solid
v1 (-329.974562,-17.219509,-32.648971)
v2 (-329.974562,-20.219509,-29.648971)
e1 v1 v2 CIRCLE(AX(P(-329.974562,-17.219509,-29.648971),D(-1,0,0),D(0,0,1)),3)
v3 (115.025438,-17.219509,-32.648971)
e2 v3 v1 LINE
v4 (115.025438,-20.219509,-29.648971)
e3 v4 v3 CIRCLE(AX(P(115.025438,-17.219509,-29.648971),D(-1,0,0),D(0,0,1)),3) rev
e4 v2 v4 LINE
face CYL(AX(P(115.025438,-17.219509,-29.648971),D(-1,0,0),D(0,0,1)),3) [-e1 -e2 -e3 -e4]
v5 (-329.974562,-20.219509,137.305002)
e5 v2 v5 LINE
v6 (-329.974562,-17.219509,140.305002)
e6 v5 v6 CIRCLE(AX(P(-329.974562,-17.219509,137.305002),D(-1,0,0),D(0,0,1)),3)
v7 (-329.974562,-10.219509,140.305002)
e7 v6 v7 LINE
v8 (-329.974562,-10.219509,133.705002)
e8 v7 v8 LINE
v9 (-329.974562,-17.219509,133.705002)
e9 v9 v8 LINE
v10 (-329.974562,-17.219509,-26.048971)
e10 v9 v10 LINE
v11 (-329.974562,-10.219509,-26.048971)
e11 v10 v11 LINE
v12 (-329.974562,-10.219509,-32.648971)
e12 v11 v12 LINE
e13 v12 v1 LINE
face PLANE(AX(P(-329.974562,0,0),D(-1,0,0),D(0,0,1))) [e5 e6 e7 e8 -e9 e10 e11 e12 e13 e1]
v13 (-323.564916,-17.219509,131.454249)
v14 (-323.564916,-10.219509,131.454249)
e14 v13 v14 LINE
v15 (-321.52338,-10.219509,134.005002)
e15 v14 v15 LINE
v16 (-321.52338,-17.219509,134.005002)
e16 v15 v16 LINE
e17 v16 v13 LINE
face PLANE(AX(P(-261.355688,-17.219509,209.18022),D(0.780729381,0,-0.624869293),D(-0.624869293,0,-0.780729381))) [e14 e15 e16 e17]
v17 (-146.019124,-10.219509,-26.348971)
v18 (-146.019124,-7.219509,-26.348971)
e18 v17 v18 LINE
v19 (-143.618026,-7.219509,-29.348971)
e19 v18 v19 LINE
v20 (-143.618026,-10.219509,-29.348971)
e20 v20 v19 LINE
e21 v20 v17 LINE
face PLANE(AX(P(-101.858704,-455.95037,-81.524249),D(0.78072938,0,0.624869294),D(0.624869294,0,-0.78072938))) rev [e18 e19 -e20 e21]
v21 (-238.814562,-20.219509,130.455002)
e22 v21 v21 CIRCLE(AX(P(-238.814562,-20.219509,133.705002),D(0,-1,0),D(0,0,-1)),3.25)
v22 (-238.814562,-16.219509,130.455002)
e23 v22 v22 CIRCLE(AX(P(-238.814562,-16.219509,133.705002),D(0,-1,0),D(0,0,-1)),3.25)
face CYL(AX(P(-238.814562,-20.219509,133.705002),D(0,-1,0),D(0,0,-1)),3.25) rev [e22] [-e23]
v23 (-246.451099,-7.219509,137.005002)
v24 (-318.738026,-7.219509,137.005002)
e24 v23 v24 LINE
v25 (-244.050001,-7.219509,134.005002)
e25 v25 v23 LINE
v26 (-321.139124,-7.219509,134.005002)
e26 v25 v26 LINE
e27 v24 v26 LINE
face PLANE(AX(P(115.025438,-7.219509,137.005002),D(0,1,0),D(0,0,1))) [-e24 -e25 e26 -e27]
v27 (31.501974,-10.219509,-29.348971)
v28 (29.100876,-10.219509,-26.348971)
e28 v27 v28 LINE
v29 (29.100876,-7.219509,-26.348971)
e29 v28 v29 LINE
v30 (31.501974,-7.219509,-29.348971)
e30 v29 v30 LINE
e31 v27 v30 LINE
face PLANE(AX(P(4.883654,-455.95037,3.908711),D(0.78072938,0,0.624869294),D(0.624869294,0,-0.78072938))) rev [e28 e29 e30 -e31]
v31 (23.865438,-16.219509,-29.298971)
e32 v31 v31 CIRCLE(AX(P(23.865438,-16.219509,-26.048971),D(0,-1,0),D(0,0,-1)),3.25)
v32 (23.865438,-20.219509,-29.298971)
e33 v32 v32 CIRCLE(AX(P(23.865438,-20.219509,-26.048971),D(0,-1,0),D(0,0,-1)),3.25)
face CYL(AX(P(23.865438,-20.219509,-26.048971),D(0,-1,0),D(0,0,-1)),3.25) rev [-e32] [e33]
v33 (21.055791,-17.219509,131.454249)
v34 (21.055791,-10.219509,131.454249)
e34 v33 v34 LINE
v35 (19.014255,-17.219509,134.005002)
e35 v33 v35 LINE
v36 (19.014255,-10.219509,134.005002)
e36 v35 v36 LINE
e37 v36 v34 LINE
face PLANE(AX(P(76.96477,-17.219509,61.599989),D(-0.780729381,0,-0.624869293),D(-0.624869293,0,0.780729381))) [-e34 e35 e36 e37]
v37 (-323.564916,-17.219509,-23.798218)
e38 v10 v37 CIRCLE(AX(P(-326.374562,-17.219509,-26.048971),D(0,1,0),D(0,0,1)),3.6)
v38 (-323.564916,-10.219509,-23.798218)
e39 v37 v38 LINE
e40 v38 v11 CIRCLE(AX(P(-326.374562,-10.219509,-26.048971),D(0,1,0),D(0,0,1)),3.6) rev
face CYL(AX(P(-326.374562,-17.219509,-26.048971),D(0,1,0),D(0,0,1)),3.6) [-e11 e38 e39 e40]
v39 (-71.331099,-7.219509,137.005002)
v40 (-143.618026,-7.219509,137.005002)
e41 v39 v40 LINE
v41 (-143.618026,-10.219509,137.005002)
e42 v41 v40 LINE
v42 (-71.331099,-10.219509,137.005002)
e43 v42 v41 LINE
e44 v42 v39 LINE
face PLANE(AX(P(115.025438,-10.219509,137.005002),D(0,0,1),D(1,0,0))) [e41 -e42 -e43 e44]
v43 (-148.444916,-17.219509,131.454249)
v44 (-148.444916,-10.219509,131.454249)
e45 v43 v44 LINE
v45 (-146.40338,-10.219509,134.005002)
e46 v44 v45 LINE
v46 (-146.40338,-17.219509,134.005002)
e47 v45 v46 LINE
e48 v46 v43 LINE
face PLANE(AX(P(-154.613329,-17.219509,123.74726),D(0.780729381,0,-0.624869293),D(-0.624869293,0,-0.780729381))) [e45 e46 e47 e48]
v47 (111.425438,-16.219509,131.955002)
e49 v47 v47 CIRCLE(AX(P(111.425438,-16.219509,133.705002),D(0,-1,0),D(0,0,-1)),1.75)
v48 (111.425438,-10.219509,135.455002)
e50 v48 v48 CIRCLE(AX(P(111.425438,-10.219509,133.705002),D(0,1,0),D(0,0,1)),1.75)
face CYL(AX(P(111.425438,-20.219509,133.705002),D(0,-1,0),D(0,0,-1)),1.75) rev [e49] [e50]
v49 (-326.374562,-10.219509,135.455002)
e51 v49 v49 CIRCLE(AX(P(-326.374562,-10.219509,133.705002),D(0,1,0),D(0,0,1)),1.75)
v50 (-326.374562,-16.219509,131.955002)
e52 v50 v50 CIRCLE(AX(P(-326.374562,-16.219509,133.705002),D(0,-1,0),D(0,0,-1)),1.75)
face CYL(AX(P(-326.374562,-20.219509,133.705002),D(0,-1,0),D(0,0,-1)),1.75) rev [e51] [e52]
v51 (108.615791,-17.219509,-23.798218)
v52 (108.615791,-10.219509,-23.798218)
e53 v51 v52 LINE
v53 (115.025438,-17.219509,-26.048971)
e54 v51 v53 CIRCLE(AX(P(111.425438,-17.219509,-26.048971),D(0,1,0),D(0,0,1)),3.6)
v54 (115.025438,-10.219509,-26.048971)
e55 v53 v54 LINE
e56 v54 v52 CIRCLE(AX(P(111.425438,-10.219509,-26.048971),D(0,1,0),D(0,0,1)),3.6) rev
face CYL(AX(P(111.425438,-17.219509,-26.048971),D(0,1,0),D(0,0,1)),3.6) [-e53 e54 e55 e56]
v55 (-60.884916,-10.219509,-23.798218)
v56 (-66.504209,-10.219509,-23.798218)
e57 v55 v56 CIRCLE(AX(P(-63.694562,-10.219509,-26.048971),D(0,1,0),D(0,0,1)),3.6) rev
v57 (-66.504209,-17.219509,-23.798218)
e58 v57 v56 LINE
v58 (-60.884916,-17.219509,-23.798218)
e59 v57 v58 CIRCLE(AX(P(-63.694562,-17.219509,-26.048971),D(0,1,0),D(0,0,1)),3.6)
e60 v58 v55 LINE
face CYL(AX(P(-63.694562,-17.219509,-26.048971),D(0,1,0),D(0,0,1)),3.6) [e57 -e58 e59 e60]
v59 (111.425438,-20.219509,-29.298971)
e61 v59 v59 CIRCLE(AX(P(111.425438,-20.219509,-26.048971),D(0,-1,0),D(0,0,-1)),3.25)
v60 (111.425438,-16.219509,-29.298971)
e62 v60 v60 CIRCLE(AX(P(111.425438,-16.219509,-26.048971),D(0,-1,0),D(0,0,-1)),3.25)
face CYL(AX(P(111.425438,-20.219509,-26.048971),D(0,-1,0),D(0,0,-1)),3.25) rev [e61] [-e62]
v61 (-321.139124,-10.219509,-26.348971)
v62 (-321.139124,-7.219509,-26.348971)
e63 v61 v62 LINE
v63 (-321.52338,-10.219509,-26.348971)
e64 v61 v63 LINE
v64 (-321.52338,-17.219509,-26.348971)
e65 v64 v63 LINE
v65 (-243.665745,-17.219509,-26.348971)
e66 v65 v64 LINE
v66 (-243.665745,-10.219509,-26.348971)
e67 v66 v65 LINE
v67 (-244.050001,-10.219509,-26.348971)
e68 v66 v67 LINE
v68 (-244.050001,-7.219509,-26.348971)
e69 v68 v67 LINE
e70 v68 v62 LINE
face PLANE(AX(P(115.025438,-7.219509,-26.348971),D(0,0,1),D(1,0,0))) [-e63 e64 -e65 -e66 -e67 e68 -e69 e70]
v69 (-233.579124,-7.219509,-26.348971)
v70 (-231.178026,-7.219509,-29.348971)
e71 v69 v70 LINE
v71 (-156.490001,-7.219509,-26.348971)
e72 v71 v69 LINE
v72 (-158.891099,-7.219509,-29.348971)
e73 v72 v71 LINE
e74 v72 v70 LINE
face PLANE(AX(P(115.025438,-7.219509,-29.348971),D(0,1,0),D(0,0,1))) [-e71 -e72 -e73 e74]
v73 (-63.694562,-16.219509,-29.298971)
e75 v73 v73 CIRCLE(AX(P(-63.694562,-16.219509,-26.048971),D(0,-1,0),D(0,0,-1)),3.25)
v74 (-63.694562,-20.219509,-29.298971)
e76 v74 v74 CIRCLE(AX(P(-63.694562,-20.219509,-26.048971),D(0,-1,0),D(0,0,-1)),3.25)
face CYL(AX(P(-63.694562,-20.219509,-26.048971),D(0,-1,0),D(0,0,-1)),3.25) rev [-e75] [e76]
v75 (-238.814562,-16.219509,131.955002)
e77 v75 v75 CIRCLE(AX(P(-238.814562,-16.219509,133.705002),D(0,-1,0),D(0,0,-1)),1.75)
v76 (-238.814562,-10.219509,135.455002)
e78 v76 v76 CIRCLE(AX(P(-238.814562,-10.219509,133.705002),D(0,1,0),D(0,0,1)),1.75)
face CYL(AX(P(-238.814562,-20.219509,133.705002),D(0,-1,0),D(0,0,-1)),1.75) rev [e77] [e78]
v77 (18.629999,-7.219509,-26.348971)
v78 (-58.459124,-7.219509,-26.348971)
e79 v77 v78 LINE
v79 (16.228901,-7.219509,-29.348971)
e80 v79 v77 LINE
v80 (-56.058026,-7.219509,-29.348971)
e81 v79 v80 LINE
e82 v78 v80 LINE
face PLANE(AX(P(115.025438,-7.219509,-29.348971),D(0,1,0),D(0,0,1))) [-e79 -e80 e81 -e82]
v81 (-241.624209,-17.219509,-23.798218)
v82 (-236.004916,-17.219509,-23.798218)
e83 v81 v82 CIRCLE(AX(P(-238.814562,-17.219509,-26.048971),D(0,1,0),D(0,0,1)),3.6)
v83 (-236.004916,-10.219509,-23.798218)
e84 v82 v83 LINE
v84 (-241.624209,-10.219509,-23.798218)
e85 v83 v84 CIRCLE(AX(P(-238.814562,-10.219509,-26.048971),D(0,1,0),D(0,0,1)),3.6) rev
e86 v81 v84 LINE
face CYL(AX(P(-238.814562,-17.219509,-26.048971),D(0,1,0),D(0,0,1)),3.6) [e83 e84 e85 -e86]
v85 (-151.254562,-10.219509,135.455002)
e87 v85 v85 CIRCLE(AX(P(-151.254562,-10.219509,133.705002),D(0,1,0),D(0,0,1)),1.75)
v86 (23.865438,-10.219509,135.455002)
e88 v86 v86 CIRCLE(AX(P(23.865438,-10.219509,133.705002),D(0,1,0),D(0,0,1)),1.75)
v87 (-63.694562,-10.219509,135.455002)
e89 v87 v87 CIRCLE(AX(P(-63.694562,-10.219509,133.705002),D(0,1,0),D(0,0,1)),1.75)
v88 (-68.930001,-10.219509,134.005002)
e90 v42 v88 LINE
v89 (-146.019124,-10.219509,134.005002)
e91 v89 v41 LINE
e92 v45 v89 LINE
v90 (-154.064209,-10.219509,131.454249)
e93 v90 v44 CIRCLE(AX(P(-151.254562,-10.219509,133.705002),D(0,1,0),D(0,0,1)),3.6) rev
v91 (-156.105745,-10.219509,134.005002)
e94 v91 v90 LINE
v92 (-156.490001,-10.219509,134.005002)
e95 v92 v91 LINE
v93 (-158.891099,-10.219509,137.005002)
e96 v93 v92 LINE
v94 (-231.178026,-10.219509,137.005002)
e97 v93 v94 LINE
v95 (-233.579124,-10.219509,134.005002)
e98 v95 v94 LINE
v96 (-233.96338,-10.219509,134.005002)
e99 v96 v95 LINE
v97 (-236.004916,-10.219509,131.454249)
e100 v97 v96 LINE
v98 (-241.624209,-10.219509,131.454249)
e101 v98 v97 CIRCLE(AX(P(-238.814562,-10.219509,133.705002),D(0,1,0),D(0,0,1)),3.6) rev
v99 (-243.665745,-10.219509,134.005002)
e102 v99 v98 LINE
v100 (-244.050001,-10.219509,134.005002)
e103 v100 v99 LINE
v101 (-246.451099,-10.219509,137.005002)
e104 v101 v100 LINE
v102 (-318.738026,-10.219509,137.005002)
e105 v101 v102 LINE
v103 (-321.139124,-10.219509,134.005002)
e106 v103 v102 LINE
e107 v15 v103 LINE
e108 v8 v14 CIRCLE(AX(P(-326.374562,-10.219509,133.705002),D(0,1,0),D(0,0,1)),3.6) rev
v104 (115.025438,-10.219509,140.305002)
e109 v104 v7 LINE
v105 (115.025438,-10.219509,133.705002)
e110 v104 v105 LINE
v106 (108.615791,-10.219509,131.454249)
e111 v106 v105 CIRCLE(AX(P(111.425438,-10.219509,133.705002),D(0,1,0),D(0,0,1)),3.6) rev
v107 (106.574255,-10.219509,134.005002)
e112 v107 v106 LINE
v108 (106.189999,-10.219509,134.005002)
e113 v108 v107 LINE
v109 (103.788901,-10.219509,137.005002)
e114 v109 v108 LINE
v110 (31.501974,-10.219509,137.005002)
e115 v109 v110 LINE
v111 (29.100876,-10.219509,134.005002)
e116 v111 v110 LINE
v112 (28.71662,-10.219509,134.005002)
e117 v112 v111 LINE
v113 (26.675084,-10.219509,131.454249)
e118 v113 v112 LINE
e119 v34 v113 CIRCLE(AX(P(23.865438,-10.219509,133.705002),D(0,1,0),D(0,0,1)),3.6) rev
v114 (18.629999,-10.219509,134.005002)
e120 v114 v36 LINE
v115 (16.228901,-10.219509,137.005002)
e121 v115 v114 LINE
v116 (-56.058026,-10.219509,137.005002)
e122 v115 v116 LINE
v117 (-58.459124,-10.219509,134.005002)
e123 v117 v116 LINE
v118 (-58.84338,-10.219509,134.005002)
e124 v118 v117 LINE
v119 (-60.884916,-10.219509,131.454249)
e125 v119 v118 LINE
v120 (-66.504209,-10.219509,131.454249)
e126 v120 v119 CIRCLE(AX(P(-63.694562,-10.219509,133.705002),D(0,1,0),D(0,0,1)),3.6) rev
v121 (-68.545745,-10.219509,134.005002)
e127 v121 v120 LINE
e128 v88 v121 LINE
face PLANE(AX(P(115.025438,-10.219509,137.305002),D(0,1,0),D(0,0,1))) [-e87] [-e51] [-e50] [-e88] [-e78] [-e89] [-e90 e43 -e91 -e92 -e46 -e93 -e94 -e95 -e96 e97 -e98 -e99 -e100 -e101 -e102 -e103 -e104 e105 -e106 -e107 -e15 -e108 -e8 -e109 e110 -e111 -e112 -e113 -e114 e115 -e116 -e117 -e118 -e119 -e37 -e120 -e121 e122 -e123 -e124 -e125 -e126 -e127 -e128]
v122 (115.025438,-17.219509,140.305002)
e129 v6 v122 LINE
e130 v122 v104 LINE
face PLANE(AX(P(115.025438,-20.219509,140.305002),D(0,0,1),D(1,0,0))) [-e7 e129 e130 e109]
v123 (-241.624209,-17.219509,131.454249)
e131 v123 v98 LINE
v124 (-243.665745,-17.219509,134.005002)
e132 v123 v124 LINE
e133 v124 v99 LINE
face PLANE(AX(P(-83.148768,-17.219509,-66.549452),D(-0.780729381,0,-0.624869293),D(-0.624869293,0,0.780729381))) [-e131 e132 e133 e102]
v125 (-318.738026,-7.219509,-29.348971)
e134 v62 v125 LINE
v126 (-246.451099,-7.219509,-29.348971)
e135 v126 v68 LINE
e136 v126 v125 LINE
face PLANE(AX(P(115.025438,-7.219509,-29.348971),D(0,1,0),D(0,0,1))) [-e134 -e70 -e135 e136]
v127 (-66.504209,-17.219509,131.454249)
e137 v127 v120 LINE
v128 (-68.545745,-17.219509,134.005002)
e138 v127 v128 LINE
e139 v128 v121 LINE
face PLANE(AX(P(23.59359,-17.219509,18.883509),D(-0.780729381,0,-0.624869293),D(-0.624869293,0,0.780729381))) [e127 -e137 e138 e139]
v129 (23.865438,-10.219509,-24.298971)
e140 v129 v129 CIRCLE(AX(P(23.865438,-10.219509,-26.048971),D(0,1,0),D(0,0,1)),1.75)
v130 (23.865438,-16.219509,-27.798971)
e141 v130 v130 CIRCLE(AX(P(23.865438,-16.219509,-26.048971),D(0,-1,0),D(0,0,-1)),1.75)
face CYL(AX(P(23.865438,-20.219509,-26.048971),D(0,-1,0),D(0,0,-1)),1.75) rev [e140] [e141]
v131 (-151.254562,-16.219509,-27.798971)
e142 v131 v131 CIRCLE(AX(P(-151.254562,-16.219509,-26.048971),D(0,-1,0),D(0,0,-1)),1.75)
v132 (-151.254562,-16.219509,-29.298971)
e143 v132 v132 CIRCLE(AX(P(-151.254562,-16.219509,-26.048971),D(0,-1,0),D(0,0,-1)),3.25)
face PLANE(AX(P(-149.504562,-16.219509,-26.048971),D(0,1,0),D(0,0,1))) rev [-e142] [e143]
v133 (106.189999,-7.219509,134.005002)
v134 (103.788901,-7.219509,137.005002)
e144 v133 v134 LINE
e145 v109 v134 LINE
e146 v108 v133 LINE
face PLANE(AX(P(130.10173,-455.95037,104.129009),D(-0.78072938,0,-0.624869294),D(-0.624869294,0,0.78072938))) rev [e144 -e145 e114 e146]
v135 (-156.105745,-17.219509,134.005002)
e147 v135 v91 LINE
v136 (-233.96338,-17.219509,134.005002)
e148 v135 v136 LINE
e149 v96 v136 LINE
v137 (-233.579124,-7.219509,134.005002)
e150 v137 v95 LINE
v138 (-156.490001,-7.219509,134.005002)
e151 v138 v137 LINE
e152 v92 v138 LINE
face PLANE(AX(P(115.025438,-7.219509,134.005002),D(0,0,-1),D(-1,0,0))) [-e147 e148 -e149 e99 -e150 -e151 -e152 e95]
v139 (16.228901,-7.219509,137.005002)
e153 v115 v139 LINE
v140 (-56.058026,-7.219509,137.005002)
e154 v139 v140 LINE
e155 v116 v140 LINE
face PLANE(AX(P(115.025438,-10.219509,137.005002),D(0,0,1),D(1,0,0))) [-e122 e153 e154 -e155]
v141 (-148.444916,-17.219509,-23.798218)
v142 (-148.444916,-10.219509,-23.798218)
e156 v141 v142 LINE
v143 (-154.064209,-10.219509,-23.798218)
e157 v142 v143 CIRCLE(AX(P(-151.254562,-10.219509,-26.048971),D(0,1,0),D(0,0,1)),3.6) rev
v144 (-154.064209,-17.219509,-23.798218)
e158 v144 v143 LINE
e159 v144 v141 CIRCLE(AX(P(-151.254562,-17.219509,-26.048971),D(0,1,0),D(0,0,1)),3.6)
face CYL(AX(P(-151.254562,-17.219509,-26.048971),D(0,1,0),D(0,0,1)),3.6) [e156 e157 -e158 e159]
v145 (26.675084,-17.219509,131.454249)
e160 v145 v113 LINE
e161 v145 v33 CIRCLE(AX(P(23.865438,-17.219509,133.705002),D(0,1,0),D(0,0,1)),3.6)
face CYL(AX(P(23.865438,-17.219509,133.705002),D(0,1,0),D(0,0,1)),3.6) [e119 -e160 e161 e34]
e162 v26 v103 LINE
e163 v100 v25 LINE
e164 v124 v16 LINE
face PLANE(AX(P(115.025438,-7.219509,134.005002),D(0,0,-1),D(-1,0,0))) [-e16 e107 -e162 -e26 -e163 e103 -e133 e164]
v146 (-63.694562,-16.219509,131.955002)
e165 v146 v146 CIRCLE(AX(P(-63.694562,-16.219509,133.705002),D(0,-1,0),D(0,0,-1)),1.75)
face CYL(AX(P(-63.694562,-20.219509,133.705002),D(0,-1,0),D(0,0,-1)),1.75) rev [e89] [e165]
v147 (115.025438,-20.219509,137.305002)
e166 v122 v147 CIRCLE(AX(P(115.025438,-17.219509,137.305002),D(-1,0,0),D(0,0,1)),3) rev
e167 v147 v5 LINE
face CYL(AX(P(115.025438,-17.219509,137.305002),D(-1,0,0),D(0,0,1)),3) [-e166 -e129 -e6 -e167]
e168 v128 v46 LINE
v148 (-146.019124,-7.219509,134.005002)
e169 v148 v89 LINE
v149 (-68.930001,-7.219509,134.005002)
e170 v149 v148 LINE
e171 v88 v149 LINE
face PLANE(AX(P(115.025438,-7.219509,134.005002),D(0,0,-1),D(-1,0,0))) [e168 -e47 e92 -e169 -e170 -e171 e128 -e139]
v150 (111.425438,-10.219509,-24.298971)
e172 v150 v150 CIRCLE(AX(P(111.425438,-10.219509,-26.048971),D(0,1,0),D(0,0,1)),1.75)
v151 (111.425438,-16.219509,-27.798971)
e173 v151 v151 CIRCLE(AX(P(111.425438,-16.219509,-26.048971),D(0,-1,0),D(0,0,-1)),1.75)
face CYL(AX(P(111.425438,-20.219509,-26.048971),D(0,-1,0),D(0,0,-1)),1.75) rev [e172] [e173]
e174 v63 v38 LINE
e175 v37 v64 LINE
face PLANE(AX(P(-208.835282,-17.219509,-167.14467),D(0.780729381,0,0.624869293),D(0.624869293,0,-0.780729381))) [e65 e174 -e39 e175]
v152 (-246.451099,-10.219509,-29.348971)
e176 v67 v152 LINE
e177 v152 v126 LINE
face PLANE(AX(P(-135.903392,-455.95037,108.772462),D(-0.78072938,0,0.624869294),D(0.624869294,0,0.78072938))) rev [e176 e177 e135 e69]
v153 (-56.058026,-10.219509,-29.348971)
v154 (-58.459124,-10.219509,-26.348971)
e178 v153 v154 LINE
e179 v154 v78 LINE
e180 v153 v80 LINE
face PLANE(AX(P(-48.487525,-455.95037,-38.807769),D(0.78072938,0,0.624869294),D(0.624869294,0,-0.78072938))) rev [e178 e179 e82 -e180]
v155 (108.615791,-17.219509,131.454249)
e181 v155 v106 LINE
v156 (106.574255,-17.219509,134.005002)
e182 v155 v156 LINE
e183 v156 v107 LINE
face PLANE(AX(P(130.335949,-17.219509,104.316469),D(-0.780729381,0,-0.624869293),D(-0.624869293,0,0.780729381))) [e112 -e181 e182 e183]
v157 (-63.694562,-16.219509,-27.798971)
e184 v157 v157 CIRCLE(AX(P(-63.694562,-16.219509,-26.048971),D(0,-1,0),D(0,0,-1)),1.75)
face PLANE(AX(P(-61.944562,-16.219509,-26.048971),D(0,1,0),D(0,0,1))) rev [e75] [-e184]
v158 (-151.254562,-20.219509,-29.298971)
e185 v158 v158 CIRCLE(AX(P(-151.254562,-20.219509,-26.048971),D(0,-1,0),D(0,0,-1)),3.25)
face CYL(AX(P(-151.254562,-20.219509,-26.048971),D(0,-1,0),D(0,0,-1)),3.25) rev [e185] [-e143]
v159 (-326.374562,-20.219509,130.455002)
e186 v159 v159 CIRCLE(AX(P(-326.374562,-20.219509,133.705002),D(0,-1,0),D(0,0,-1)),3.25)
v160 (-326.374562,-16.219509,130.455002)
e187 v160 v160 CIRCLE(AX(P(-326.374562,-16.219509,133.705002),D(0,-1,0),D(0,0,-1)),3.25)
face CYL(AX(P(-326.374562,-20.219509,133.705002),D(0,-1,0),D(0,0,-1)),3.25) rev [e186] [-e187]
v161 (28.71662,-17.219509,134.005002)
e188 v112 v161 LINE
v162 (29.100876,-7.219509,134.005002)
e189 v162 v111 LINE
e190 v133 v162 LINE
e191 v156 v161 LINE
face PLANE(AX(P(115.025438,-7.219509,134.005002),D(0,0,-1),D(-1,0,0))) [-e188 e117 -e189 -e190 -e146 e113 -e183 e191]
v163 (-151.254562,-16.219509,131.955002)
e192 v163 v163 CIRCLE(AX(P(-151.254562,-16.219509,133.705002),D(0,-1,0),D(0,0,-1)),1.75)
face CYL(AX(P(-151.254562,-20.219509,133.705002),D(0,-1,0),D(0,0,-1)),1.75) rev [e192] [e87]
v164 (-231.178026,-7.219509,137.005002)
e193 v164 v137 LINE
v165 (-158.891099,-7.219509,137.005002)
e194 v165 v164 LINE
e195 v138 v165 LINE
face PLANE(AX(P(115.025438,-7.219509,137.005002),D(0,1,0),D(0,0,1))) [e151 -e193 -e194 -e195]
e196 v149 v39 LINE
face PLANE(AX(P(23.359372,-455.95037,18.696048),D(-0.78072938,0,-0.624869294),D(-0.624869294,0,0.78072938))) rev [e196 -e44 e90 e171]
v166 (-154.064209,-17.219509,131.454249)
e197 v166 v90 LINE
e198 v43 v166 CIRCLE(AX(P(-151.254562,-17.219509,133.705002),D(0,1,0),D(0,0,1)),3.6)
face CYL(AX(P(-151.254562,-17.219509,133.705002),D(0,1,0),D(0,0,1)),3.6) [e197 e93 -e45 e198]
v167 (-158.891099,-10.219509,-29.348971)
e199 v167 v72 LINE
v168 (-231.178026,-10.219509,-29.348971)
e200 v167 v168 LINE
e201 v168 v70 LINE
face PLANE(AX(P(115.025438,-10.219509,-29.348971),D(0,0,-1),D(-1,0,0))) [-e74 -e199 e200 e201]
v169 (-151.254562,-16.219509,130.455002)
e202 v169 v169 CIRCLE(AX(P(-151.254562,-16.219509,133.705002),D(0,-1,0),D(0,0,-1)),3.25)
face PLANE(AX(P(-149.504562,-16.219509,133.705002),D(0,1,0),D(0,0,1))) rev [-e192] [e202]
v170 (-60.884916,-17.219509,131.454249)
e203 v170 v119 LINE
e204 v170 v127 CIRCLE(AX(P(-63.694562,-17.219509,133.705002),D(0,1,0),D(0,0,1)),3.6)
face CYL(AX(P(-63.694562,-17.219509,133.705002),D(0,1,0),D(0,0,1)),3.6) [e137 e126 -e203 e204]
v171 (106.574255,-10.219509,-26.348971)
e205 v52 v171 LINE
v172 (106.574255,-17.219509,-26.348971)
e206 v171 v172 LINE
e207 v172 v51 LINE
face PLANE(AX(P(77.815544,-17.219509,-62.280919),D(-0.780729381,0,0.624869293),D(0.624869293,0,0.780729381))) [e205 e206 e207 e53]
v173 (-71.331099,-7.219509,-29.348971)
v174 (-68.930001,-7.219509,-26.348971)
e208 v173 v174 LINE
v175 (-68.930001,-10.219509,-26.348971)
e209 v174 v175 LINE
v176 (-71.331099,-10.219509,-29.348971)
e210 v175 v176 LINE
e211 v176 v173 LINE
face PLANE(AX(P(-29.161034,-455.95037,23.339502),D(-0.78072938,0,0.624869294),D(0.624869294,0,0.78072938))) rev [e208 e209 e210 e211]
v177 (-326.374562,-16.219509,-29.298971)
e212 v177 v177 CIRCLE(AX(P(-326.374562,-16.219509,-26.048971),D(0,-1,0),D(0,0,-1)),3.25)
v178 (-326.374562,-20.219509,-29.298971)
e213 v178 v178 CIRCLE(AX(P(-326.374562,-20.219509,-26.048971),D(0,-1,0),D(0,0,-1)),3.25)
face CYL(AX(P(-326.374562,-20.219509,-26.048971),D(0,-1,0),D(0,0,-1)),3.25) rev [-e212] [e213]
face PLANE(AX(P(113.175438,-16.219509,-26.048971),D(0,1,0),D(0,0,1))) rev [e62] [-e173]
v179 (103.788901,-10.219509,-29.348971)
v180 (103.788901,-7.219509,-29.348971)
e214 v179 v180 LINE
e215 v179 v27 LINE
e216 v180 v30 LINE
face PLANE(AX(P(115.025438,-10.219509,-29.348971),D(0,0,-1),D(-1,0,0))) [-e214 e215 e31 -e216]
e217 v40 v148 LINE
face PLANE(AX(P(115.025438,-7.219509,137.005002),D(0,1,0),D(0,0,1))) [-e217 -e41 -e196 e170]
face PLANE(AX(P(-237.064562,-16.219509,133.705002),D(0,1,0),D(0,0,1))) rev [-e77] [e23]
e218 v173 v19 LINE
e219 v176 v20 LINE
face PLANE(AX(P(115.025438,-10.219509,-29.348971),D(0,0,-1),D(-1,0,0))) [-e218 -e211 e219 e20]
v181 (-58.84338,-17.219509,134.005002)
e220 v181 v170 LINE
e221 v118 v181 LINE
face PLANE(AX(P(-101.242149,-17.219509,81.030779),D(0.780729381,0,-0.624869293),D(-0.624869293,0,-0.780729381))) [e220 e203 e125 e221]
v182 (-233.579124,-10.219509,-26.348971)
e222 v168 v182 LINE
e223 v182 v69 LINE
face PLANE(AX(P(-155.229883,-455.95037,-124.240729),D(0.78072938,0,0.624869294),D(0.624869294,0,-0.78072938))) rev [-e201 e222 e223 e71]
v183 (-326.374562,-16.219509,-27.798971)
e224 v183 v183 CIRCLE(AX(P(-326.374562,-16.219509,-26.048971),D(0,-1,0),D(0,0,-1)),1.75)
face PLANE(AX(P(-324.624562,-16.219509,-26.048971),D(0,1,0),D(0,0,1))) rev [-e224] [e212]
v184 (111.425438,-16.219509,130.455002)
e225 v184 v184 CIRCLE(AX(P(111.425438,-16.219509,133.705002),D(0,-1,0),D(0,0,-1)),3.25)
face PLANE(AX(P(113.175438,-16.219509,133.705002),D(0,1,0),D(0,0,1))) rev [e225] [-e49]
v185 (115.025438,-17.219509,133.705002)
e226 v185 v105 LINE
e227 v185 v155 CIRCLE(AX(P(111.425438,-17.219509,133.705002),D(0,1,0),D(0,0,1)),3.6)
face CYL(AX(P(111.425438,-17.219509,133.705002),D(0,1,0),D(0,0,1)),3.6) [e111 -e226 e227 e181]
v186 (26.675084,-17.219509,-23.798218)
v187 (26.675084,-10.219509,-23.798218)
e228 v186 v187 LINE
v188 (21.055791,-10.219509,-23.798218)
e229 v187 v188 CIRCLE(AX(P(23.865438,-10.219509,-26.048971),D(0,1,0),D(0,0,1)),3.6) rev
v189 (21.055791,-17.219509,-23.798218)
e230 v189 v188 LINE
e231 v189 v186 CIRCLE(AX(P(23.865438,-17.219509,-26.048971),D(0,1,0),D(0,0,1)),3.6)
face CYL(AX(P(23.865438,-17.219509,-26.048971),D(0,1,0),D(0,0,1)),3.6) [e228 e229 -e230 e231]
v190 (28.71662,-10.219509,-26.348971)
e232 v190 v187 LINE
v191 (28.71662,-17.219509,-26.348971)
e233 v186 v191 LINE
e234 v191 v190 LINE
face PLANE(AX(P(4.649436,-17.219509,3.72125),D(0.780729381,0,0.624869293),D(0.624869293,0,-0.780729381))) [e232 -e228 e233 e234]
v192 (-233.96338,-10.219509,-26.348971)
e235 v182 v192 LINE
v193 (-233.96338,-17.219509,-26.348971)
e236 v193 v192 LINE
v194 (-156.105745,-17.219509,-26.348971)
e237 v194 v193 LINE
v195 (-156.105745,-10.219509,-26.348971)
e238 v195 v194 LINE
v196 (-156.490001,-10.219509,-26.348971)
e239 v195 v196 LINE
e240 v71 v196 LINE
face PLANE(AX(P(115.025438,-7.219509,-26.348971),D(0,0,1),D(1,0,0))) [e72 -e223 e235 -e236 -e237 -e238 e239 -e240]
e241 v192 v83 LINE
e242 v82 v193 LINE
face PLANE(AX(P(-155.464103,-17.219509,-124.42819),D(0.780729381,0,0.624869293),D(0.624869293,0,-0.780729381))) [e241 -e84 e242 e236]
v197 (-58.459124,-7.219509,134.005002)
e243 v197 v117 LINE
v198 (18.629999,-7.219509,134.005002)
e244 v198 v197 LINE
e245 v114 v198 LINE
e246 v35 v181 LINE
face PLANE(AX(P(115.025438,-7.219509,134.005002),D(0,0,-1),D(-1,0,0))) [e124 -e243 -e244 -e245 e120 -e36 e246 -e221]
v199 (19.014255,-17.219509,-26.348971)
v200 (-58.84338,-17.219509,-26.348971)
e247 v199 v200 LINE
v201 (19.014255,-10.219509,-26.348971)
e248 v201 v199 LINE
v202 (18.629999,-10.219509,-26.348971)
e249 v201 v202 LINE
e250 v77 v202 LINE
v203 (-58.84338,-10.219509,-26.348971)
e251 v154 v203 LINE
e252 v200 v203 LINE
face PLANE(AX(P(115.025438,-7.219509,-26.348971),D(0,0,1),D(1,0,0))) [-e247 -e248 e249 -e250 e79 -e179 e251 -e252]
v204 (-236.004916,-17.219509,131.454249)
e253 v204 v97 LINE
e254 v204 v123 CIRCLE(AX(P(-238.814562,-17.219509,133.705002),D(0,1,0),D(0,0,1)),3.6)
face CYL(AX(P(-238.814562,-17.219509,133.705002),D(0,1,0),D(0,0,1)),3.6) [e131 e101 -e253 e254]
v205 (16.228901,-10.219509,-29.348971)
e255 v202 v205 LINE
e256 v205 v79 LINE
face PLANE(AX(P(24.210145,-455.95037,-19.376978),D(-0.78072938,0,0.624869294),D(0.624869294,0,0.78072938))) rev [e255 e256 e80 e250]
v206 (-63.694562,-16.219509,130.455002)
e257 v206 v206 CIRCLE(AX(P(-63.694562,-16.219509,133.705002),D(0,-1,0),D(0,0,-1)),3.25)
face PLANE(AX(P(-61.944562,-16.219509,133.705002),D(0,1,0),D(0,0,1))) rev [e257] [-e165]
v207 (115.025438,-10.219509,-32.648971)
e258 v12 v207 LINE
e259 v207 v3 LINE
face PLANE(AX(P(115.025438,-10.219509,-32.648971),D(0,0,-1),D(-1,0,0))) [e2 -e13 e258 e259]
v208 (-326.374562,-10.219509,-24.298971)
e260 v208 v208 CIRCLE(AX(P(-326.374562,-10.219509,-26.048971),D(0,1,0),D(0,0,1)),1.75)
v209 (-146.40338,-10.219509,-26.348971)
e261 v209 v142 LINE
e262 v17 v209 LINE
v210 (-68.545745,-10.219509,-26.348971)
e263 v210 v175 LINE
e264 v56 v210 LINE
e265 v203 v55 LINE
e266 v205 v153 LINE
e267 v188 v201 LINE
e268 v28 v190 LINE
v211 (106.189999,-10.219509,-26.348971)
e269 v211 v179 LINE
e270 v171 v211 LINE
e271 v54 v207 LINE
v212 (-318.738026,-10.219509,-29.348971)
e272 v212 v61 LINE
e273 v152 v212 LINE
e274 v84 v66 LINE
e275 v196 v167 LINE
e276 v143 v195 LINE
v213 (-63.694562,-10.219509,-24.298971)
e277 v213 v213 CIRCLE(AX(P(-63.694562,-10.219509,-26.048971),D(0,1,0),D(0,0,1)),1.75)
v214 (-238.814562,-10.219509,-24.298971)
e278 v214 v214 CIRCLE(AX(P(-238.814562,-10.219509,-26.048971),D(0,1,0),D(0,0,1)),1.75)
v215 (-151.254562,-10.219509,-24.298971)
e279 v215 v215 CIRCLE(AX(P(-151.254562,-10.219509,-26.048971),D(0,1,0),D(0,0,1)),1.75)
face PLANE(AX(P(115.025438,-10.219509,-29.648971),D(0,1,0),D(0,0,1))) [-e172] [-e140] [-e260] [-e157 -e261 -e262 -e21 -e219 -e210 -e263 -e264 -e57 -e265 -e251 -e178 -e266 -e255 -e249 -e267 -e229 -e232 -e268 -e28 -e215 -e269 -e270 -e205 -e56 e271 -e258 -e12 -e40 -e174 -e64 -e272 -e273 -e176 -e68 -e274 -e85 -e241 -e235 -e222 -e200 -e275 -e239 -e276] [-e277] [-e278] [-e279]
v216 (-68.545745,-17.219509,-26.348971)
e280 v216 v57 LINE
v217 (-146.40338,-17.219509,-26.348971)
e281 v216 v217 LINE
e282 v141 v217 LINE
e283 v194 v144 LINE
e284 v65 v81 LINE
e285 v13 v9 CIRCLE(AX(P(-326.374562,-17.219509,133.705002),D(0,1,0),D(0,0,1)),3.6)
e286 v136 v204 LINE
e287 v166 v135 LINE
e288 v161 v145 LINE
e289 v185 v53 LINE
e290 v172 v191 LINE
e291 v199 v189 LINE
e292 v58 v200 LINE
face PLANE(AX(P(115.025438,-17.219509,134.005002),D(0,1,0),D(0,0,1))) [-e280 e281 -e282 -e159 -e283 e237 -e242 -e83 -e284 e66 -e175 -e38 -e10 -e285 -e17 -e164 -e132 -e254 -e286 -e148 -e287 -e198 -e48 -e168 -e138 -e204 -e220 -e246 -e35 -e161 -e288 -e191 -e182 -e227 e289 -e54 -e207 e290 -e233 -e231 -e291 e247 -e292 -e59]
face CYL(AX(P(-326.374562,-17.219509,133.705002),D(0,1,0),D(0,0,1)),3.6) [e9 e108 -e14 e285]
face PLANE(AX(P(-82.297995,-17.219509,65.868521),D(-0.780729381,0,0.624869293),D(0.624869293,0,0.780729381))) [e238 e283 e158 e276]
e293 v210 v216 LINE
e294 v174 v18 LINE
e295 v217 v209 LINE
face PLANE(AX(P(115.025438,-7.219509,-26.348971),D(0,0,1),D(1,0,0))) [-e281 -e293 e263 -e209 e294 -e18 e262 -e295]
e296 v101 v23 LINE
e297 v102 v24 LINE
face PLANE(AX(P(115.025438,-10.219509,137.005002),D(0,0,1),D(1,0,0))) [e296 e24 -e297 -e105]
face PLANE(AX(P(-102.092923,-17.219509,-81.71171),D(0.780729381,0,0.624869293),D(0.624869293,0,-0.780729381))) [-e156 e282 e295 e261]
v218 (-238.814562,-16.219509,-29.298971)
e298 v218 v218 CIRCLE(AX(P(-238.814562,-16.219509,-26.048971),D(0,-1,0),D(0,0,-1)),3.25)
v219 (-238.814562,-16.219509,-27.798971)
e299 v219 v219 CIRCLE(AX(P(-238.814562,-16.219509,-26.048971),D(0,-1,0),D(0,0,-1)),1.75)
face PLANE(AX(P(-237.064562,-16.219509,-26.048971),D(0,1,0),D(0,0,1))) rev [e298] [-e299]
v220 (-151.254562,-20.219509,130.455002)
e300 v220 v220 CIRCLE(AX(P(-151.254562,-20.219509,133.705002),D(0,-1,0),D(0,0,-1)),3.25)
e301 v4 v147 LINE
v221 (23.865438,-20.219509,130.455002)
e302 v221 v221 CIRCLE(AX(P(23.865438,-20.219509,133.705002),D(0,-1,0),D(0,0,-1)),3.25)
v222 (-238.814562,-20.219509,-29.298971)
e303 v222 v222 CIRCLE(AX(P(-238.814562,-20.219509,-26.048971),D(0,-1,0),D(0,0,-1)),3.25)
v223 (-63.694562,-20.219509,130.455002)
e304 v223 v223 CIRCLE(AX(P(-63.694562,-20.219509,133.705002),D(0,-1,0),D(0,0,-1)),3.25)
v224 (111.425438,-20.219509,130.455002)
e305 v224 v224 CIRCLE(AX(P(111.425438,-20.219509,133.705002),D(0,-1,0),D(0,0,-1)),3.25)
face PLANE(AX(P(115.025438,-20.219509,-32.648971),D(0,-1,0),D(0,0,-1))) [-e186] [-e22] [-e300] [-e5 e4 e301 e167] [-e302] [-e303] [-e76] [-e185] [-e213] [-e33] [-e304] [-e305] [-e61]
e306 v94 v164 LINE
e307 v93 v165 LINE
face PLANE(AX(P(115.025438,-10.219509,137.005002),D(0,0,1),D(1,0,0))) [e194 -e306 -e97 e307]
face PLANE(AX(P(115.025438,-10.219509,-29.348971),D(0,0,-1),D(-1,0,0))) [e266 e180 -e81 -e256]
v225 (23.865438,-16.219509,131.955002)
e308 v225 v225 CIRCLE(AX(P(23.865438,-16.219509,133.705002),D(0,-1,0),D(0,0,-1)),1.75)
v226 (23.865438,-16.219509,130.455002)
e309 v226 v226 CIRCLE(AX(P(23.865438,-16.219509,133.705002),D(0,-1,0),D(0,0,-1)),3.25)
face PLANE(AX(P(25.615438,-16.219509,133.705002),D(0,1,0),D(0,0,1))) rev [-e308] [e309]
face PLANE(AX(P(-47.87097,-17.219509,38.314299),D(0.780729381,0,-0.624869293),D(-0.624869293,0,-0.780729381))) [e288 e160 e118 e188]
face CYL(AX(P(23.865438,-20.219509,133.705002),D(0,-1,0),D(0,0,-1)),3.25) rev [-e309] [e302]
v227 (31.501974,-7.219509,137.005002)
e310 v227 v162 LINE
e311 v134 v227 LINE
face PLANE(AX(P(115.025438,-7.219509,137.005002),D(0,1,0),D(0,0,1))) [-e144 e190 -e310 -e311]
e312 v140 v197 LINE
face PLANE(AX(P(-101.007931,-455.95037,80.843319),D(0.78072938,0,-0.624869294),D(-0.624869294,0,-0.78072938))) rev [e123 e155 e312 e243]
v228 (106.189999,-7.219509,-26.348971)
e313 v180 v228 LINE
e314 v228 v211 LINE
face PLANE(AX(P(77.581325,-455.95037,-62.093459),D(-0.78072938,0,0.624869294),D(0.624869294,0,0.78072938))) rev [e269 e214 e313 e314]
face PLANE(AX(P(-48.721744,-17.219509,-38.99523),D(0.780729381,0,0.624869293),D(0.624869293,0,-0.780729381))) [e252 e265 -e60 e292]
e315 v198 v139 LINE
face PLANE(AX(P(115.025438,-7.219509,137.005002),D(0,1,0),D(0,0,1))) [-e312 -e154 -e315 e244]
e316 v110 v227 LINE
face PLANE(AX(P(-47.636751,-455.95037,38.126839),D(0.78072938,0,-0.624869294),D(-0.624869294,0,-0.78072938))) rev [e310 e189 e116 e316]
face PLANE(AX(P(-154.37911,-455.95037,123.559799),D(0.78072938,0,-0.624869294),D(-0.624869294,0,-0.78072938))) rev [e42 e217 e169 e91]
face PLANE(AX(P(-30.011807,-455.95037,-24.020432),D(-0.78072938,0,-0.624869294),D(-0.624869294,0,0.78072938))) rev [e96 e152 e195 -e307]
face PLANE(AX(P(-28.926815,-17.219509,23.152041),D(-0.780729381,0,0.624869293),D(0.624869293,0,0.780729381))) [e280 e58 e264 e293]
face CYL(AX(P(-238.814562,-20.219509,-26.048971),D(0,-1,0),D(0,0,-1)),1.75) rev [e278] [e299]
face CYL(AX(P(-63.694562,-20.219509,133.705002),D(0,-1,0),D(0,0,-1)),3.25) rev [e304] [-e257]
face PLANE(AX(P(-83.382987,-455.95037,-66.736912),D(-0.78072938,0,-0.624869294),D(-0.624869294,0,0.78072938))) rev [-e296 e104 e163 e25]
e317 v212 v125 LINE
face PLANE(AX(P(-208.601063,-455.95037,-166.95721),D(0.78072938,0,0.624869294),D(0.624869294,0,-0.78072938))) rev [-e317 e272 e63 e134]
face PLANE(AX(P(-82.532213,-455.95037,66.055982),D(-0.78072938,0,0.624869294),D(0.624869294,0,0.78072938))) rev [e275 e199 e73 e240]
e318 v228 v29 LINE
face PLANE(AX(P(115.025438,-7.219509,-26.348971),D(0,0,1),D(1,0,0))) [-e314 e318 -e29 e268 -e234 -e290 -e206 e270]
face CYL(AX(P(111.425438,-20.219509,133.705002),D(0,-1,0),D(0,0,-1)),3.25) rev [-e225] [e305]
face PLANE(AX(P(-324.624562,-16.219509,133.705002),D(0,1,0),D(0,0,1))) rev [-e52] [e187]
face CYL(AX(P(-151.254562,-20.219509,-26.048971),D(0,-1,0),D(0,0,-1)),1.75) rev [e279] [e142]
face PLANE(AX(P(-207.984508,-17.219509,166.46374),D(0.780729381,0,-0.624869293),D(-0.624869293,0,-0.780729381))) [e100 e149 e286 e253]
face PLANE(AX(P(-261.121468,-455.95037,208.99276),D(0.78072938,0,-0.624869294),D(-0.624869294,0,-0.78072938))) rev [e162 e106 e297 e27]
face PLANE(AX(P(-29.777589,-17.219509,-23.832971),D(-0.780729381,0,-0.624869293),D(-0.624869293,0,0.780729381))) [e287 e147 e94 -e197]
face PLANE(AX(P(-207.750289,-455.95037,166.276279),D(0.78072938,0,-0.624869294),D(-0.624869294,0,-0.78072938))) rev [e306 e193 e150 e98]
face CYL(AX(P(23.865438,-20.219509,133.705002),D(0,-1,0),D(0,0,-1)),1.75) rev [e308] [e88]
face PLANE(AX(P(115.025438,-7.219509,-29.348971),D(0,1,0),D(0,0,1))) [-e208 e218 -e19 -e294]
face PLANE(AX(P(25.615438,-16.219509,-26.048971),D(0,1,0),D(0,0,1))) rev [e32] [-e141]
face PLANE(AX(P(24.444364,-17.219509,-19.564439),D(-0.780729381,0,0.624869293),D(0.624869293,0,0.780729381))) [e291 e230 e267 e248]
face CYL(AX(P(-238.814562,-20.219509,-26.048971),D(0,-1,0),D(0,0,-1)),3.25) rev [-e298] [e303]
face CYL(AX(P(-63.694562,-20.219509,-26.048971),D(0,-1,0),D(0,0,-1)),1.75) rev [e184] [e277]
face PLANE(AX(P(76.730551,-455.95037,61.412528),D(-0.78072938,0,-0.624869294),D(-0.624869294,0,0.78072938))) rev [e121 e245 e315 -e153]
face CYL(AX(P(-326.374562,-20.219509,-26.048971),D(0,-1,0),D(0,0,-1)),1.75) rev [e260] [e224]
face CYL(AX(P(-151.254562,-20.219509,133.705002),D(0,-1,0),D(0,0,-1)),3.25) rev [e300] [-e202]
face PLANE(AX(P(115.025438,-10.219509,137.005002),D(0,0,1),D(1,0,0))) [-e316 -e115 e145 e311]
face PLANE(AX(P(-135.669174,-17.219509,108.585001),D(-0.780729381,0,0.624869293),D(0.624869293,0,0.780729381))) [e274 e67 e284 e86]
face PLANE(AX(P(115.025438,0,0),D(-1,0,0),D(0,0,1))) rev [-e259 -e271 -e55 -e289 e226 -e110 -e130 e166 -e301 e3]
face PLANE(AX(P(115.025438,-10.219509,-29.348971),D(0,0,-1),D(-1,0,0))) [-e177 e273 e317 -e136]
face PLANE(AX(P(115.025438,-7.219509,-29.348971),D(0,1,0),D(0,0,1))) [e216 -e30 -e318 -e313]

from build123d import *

# Parameters (mm, degrees)
BOSS_EXTRUDE1_DEPTH                     = 445
FILLET1_R                               = 3
BOSS_EXTRUDE2_DEPTH                     = 17.000001
CUT_EXTRUDE2_START                      = -10
CUT_EXTRUDE2_DEPTH                      = 10
CBORE_FOR_M6_HEX_HEAD_BOLT1_D           = 3.5
CBORE_FOR_M6_HEX_HEAD_BOLT1_CBORE_D     = 6.5
CBORE_FOR_M6_HEX_HEAD_BOLT1_CBORE_DEPTH = 4


# Read off the part's stored shape, not the designer's step: Cut-Extrude2
with BuildPart() as part:
    # Sketch1 → Boss-Extrude1 (new body)
    with BuildSketch(Plane.ZY.offset(329.974562358)):
        Polygon((-32.648970599, -10.219509128), (-32.648970599, -20.219509128), (140.305001839, -20.219509128), (140.305001839, -10.219509128), (137.305001839, -10.219509128), (137.005001839, -10.219509128), (137.005001839, -7.219509128), (134.005001839, -7.219509128), (134.005001839, -17.219509128), (-26.348970599, -17.219509128), (-26.348970599, -7.219509128), (-29.348970599, -7.219509128), (-29.348970599, -10.219509128), (-29.648970599, -10.219509128), align=None)
    extrude(amount=-BOSS_EXTRUDE1_DEPTH)

    # Fillet1
    fillet1_edges = [part.edges().sort_by_distance(p)[0] for p in [
        (-107.474562358, -20.219509128, 140.305001839),
        (-107.474562358, -20.219509128, -32.648970599),
    ]]
    fillet(fillet1_edges, radius=FILLET1_R)

    # Sketch2 → Boss-Extrude2 (add)
    with BuildSketch(Plane(origin=(0, -0.219509128, 0), x_dir=(1, 0, 0), z_dir=(0, 1, 0))):
        with BuildLine():
            Line((-231.322172227, -137.305001839), (-236.004916059, -131.454249149))
            ThreePointArc((-236.004916059, -131.454249149), (-238.814562358, -130.105001839), (-241.624208658, -131.454249149))
            Line((-241.624208658, -131.454249149), (-246.30695249, -137.305001839))
            Line((-246.30695249, -137.305001839), (-318.882172227, -137.305001839))
            Line((-318.882172227, -137.305001839), (-329.974562358, -137.305001839))
            Line((-329.974562358, -137.305001839), (-329.974562358, -140.305001839))
            Line((-329.974562358, -140.305001839), (115.025437642, -140.305001839))
            Line((115.025437642, -140.305001839), (115.025437642, -137.305001839))
            Line((115.025437642, -137.305001839), (115.025437642, -133.705001839))
            ThreePointArc((115.025437642, -133.705001839), (112.618180976, -130.308332391), (108.615791342, -131.454249149))
            Line((108.615791342, -131.454249149), (103.93304751, -137.305001839))
            Line((103.93304751, -137.305001839), (31.357827773, -137.305001839))
            Line((31.357827773, -137.305001839), (26.675083941, -131.454249149))
            ThreePointArc((26.675083941, -131.454249149), (23.865437642, -130.105001839), (21.055791342, -131.454249149))
            Line((21.055791342, -131.454249149), (16.37304751, -137.305001839))
            Line((16.37304751, -137.305001839), (-56.202172227, -137.305001839))
            Line((-56.202172227, -137.305001839), (-60.884916059, -131.454249149))
            ThreePointArc((-60.884916059, -131.454249149), (-63.694562358, -130.105001839), (-66.504208658, -131.454249149))
            Line((-66.504208658, -131.454249149), (-71.18695249, -137.305001839))
            Line((-71.18695249, -137.305001839), (-143.762172227, -137.305001839))
            Line((-143.762172227, -137.305001839), (-148.444916059, -131.454249148))
            ThreePointArc((-148.444916059, -131.454249148), (-151.254562358, -130.105001839), (-154.064208658, -131.454249149))
            Line((-154.064208658, -131.454249149), (-158.74695249, -137.305001839))
            Line((-158.74695249, -137.305001839), (-231.322172227, -137.305001839))
        make_face()
        with BuildLine():
            Line((-329.974562358, 29.648970599), (-329.974562358, 26.048970599))
            ThreePointArc((-329.974562358, 26.048970599), (-327.567305693, 22.652301151), (-323.564916059, 23.798217909))
            Line((-323.564916059, 23.798217909), (-318.882172227, 29.648970599))
            Line((-318.882172227, 29.648970599), (-246.30695249, 29.648970599))
            Line((-246.30695249, 29.648970599), (-241.624208658, 23.798217909))
            ThreePointArc((-241.624208658, 23.798217909), (-238.814562358, 22.448970599), (-236.004916059, 23.798217909))
            Line((-236.004916059, 23.798217909), (-231.322172227, 29.648970599))
            Line((-231.322172227, 29.648970599), (-158.74695249, 29.648970599))
            Line((-158.74695249, 29.648970599), (-154.064208658, 23.798217909))
            ThreePointArc((-154.064208658, 23.798217909), (-151.254562358, 22.448970599), (-148.444916059, 23.798217909))
            Line((-148.444916059, 23.798217909), (-143.762172227, 29.648970599))
            Line((-143.762172227, 29.648970599), (-71.18695249, 29.648970599))
            Line((-71.18695249, 29.648970599), (-66.504208658, 23.798217909))
            ThreePointArc((-66.504208658, 23.798217909), (-63.694562358, 22.448970599), (-60.884916059, 23.798217909))
            Line((-60.884916059, 23.798217909), (-56.202172227, 29.648970599))
            Line((-56.202172227, 29.648970599), (16.37304751, 29.648970599))
            Line((16.37304751, 29.648970599), (21.055791342, 23.798217909))
            ThreePointArc((21.055791342, 23.798217909), (23.865437642, 22.448970599), (26.675083941, 23.798217909))
            Line((26.675083941, 23.798217909), (31.357827773, 29.648970599))
            Line((31.357827773, 29.648970599), (103.93304751, 29.648970599))
            Line((103.93304751, 29.648970599), (108.615791342, 23.798217909))
            ThreePointArc((108.615791342, 23.798217909), (112.618180976, 22.652301151), (115.025437642, 26.048970599))
            Line((115.025437642, 26.048970599), (115.025437642, 32.648970599))
            Line((115.025437642, 32.648970599), (-329.974562358, 32.648970599))
            Line((-329.974562358, 32.648970599), (-329.974562358, 29.648970599))
        make_face()
        with BuildLine():
            Line((-329.974562358, -133.705001839), (-329.974562358, -137.305001839))
            Line((-329.974562358, -137.305001839), (-318.882172227, -137.305001839))
            Line((-318.882172227, -137.305001839), (-323.564916059, -131.454249149))
            ThreePointArc((-323.564916059, -131.454249149), (-327.567305693, -130.308332391), (-329.974562358, -133.705001839))
        make_face()
    extrude(amount=-BOSS_EXTRUDE2_DEPTH)

    # Cut-Extrude2 outline → Cut-Extrude2 (cut)
    with BuildSketch(Plane(origin=(0, -0.219509128, 0), x_dir=(1, 0, 0), z_dir=(0, 1, 0)).offset(CUT_EXTRUDE2_START)):
        with BuildLine():
            Line((-319.122282043, -137.005001839), (-318.738025977, -137.005001839))
            Line((-318.738025977, -137.005001839), (-321.139124143, -134.005001839))
            Line((-321.139124143, -134.005001839), (-321.523380199, -134.005001839))
            Line((-321.523380199, -134.005001839), (-323.564916059, -131.454249149))
            ThreePointArc((-323.564916059, -131.454249149), (-327.567305692, -130.308332391), (-329.974562358, -133.705001839))
            Line((-329.974562358, -133.705001839), (-329.974562358, -140.305001839))
            Line((-329.974562358, -140.305001839), (115.025437642, -140.305001839))
            Line((115.025437642, -140.305001839), (115.025437642, -133.705001839))
            ThreePointArc((115.025437642, -133.705001839), (112.618180976, -130.308332391), (108.615791342, -131.454249149))
            Line((108.615791342, -131.454249149), (106.574255482, -134.005001839))
            Line((106.574255482, -134.005001839), (106.189999426, -134.005001839))
            Line((106.189999426, -134.005001839), (103.788901261, -137.005001839))
            Line((103.788901261, -137.005001839), (104.173157326, -137.005001839))
            Line((104.173157326, -137.005001839), (103.93304751, -137.305001839))
            Line((103.93304751, -137.305001839), (31.357827773, -137.305001839))
            Line((31.357827773, -137.305001839), (31.117717957, -137.005001839))
            Line((31.117717957, -137.005001839), (31.501974023, -137.005001839))
            Line((31.501974023, -137.005001839), (29.100875857, -134.005001839))
            Line((29.100875857, -134.005001839), (28.716619801, -134.005001839))
            Line((28.716619801, -134.005001839), (26.675083941, -131.454249149))
            ThreePointArc((26.675083941, -131.454249149), (23.865437641, -130.105001839), (21.055791342, -131.454249149))
            Line((21.055791342, -131.454249149), (19.014255482, -134.005001839))
            Line((19.014255482, -134.005001839), (18.629999426, -134.005001839))
            Line((18.629999426, -134.005001839), (16.228901261, -137.005001839))
            Line((16.228901261, -137.005001839), (16.613157326, -137.005001839))
            Line((16.613157326, -137.005001839), (16.37304751, -137.305001839))
            Line((16.37304751, -137.305001839), (-56.202172227, -137.305001839))
            Line((-56.202172227, -137.305001839), (-56.442282043, -137.005001839))
            Line((-56.442282043, -137.005001839), (-56.058025977, -137.005001839))
            Line((-56.058025977, -137.005001839), (-58.459124143, -134.005001839))
            Line((-58.459124143, -134.005001839), (-58.843380199, -134.005001839))
            Line((-58.843380199, -134.005001839), (-60.884916059, -131.454249149))
            ThreePointArc((-60.884916059, -131.454249149), (-63.694562358, -130.105001839), (-66.504208658, -131.454249149))
            Line((-66.504208658, -131.454249149), (-68.545744518, -134.005001839))
            Line((-68.545744518, -134.005001839), (-68.930000574, -134.005001839))
            Line((-68.930000574, -134.005001839), (-71.331098739, -137.005001839))
            Line((-71.331098739, -137.005001839), (-70.946842674, -137.005001839))
            Line((-70.946842674, -137.005001839), (-71.18695249, -137.305001839))
            Line((-71.18695249, -137.305001839), (-143.762172227, -137.305001839))
            Line((-143.762172227, -137.305001839), (-144.002282043, -137.005001839))
            Line((-144.002282043, -137.005001839), (-143.618025977, -137.005001839))
            Line((-143.618025977, -137.005001839), (-146.019124143, -134.005001839))
            Line((-146.019124143, -134.005001839), (-146.403380199, -134.005001839))
            Line((-146.403380199, -134.005001839), (-148.444916059, -131.454249149))
            ThreePointArc((-148.444916059, -131.454249149), (-151.254562359, -130.105001839), (-154.064208658, -131.454249149))
            Line((-154.064208658, -131.454249149), (-156.105744518, -134.005001839))
            Line((-156.105744518, -134.005001839), (-156.490000574, -134.005001839))
            Line((-156.490000574, -134.005001839), (-158.891098739, -137.005001839))
            Line((-158.891098739, -137.005001839), (-158.506842674, -137.005001839))
            Line((-158.506842674, -137.005001839), (-158.74695249, -137.305001839))
            Line((-158.74695249, -137.305001839), (-231.322172227, -137.305001839))
            Line((-231.322172227, -137.305001839), (-231.562282043, -137.005001839))
            Line((-231.562282043, -137.005001839), (-231.178025977, -137.005001839))
            Line((-231.178025977, -137.005001839), (-233.579124143, -134.005001839))
            Line((-233.579124143, -134.005001839), (-233.963380199, -134.005001839))
            Line((-233.963380199, -134.005001839), (-236.004916059, -131.454249149))
            ThreePointArc((-236.004916059, -131.454249149), (-238.814562359, -130.105001839), (-241.624208658, -131.454249149))
            Line((-241.624208658, -131.454249149), (-243.665744518, -134.005001839))
            Line((-243.665744518, -134.005001839), (-244.050000574, -134.005001839))
            Line((-244.050000574, -134.005001839), (-246.451098739, -137.005001839))
            Line((-246.451098739, -137.005001839), (-246.066842674, -137.005001839))
            Line((-246.066842674, -137.005001839), (-246.30695249, -137.305001839))
            Line((-246.30695249, -137.305001839), (-318.882172227, -137.305001839))
            Line((-318.882172227, -137.305001839), (-319.122282043, -137.005001839))
        make_face()
        with BuildLine():
            Line((-329.974562358, 32.648970599), (-329.974562358, 26.048970599))
            ThreePointArc((-329.974562358, 26.048970599), (-327.567305692, 22.652301151), (-323.564916059, 23.798217909))
            Line((-323.564916059, 23.798217909), (-321.523380199, 26.348970599))
            Line((-321.523380199, 26.348970599), (-321.139124143, 26.348970599))
            Line((-321.139124143, 26.348970599), (-318.738025977, 29.348970599))
            Line((-318.738025977, 29.348970599), (-319.122282043, 29.348970599))
            Line((-319.122282043, 29.348970599), (-318.882172227, 29.648970599))
            Line((-318.882172227, 29.648970599), (-246.30695249, 29.648970599))
            Line((-246.30695249, 29.648970599), (-246.066842674, 29.348970599))
            Line((-246.066842674, 29.348970599), (-246.451098739, 29.348970599))
            Line((-246.451098739, 29.348970599), (-244.050000574, 26.348970599))
            Line((-244.050000574, 26.348970599), (-243.665744518, 26.348970599))
            Line((-243.665744518, 26.348970599), (-241.624208658, 23.798217909))
            ThreePointArc((-241.624208658, 23.798217909), (-238.814562359, 22.448970599), (-236.004916059, 23.798217909))
            Line((-236.004916059, 23.798217909), (-233.963380199, 26.348970599))
            Line((-233.963380199, 26.348970599), (-233.579124143, 26.348970599))
            Line((-233.579124143, 26.348970599), (-231.178025977, 29.348970599))
            Line((-231.178025977, 29.348970599), (-231.562282043, 29.348970599))
            Line((-231.562282043, 29.348970599), (-231.322172227, 29.648970599))
            Line((-231.322172227, 29.648970599), (-158.74695249, 29.648970599))
            Line((-158.74695249, 29.648970599), (-158.506842674, 29.348970599))
            Line((-158.506842674, 29.348970599), (-158.891098739, 29.348970599))
            Line((-158.891098739, 29.348970599), (-156.490000574, 26.348970599))
            Line((-156.490000574, 26.348970599), (-156.105744518, 26.348970599))
            Line((-156.105744518, 26.348970599), (-154.064208658, 23.798217909))
            ThreePointArc((-154.064208658, 23.798217909), (-151.254562359, 22.448970599), (-148.444916059, 23.798217909))
            Line((-148.444916059, 23.798217909), (-146.403380199, 26.348970599))
            Line((-146.403380199, 26.348970599), (-146.019124143, 26.348970599))
            Line((-146.019124143, 26.348970599), (-143.618025977, 29.348970599))
            Line((-143.618025977, 29.348970599), (-144.002282043, 29.348970599))
            Line((-144.002282043, 29.348970599), (-143.762172227, 29.648970599))
            Line((-143.762172227, 29.648970599), (-71.18695249, 29.648970599))
            Line((-71.18695249, 29.648970599), (-70.946842674, 29.348970599))
            Line((-70.946842674, 29.348970599), (-71.331098739, 29.348970599))
            Line((-71.331098739, 29.348970599), (-68.930000574, 26.348970599))
            Line((-68.930000574, 26.348970599), (-68.545744518, 26.348970599))
            Line((-68.545744518, 26.348970599), (-66.504208658, 23.798217909))
            ThreePointArc((-66.504208658, 23.798217909), (-63.694562358, 22.448970599), (-60.884916059, 23.798217909))
            Line((-60.884916059, 23.798217909), (-58.843380199, 26.348970599))
            Line((-58.843380199, 26.348970599), (-58.459124143, 26.348970599))
            Line((-58.459124143, 26.348970599), (-56.058025977, 29.348970599))
            Line((-56.058025977, 29.348970599), (-56.442282043, 29.348970599))
            Line((-56.442282043, 29.348970599), (-56.202172227, 29.648970599))
            Line((-56.202172227, 29.648970599), (16.37304751, 29.648970599))
            Line((16.37304751, 29.648970599), (16.613157326, 29.348970599))
            Line((16.613157326, 29.348970599), (16.228901261, 29.348970599))
            Line((16.228901261, 29.348970599), (18.629999426, 26.348970599))
            Line((18.629999426, 26.348970599), (19.014255482, 26.348970599))
            Line((19.014255482, 26.348970599), (21.055791342, 23.798217909))
            ThreePointArc((21.055791342, 23.798217909), (23.865437641, 22.448970599), (26.675083941, 23.798217909))
            Line((26.675083941, 23.798217909), (28.716619801, 26.348970599))
            Line((28.716619801, 26.348970599), (29.100875857, 26.348970599))
            Line((29.100875857, 26.348970599), (31.501974023, 29.348970599))
            Line((31.501974023, 29.348970599), (31.117717957, 29.348970599))
            Line((31.117717957, 29.348970599), (31.357827773, 29.648970599))
            Line((31.357827773, 29.648970599), (103.93304751, 29.648970599))
            Line((103.93304751, 29.648970599), (104.173157326, 29.348970599))
            Line((104.173157326, 29.348970599), (103.788901261, 29.348970599))
            Line((103.788901261, 29.348970599), (106.189999426, 26.348970599))
            Line((106.189999426, 26.348970599), (106.574255482, 26.348970599))
            Line((106.574255482, 26.348970599), (108.615791342, 23.798217909))
            ThreePointArc((108.615791342, 23.798217909), (112.618180976, 22.652301151), (115.025437642, 26.048970599))
            Line((115.025437642, 26.048970599), (115.025437642, 32.648970599))
            Line((115.025437642, 32.648970599), (-329.974562358, 32.648970599))
        make_face()
    extrude(amount=CUT_EXTRUDE2_DEPTH, mode=Mode.SUBTRACT)

    # CBORE for M6 Hex Head Bolt1 (through all)
    with Locations(Plane(origin=(0, -20.219509128, 0), x_dir=(-1, 0, 0), z_dir=(0, -1, 0))):
        with Locations((326.374562358, -133.705001839), (238.814562358, -133.705001839), (151.254562358, -133.705001839), (63.694562358, -133.705001839), (-23.865437642, -133.705001839), (-111.425437642, -133.705001839), (-111.425437642, 26.048970599), (-23.865437642, 26.048970599), (63.694562358, 26.048970599), (151.254562358, 26.048970599), (238.814562358, 26.048970599), (326.374562358, 26.048970599)):
            CounterBoreHole(CBORE_FOR_M6_HEX_HEAD_BOLT1_D / 2, CBORE_FOR_M6_HEX_HEAD_BOLT1_CBORE_D / 2, CBORE_FOR_M6_HEX_HEAD_BOLT1_CBORE_DEPTH)


solid = part.part
